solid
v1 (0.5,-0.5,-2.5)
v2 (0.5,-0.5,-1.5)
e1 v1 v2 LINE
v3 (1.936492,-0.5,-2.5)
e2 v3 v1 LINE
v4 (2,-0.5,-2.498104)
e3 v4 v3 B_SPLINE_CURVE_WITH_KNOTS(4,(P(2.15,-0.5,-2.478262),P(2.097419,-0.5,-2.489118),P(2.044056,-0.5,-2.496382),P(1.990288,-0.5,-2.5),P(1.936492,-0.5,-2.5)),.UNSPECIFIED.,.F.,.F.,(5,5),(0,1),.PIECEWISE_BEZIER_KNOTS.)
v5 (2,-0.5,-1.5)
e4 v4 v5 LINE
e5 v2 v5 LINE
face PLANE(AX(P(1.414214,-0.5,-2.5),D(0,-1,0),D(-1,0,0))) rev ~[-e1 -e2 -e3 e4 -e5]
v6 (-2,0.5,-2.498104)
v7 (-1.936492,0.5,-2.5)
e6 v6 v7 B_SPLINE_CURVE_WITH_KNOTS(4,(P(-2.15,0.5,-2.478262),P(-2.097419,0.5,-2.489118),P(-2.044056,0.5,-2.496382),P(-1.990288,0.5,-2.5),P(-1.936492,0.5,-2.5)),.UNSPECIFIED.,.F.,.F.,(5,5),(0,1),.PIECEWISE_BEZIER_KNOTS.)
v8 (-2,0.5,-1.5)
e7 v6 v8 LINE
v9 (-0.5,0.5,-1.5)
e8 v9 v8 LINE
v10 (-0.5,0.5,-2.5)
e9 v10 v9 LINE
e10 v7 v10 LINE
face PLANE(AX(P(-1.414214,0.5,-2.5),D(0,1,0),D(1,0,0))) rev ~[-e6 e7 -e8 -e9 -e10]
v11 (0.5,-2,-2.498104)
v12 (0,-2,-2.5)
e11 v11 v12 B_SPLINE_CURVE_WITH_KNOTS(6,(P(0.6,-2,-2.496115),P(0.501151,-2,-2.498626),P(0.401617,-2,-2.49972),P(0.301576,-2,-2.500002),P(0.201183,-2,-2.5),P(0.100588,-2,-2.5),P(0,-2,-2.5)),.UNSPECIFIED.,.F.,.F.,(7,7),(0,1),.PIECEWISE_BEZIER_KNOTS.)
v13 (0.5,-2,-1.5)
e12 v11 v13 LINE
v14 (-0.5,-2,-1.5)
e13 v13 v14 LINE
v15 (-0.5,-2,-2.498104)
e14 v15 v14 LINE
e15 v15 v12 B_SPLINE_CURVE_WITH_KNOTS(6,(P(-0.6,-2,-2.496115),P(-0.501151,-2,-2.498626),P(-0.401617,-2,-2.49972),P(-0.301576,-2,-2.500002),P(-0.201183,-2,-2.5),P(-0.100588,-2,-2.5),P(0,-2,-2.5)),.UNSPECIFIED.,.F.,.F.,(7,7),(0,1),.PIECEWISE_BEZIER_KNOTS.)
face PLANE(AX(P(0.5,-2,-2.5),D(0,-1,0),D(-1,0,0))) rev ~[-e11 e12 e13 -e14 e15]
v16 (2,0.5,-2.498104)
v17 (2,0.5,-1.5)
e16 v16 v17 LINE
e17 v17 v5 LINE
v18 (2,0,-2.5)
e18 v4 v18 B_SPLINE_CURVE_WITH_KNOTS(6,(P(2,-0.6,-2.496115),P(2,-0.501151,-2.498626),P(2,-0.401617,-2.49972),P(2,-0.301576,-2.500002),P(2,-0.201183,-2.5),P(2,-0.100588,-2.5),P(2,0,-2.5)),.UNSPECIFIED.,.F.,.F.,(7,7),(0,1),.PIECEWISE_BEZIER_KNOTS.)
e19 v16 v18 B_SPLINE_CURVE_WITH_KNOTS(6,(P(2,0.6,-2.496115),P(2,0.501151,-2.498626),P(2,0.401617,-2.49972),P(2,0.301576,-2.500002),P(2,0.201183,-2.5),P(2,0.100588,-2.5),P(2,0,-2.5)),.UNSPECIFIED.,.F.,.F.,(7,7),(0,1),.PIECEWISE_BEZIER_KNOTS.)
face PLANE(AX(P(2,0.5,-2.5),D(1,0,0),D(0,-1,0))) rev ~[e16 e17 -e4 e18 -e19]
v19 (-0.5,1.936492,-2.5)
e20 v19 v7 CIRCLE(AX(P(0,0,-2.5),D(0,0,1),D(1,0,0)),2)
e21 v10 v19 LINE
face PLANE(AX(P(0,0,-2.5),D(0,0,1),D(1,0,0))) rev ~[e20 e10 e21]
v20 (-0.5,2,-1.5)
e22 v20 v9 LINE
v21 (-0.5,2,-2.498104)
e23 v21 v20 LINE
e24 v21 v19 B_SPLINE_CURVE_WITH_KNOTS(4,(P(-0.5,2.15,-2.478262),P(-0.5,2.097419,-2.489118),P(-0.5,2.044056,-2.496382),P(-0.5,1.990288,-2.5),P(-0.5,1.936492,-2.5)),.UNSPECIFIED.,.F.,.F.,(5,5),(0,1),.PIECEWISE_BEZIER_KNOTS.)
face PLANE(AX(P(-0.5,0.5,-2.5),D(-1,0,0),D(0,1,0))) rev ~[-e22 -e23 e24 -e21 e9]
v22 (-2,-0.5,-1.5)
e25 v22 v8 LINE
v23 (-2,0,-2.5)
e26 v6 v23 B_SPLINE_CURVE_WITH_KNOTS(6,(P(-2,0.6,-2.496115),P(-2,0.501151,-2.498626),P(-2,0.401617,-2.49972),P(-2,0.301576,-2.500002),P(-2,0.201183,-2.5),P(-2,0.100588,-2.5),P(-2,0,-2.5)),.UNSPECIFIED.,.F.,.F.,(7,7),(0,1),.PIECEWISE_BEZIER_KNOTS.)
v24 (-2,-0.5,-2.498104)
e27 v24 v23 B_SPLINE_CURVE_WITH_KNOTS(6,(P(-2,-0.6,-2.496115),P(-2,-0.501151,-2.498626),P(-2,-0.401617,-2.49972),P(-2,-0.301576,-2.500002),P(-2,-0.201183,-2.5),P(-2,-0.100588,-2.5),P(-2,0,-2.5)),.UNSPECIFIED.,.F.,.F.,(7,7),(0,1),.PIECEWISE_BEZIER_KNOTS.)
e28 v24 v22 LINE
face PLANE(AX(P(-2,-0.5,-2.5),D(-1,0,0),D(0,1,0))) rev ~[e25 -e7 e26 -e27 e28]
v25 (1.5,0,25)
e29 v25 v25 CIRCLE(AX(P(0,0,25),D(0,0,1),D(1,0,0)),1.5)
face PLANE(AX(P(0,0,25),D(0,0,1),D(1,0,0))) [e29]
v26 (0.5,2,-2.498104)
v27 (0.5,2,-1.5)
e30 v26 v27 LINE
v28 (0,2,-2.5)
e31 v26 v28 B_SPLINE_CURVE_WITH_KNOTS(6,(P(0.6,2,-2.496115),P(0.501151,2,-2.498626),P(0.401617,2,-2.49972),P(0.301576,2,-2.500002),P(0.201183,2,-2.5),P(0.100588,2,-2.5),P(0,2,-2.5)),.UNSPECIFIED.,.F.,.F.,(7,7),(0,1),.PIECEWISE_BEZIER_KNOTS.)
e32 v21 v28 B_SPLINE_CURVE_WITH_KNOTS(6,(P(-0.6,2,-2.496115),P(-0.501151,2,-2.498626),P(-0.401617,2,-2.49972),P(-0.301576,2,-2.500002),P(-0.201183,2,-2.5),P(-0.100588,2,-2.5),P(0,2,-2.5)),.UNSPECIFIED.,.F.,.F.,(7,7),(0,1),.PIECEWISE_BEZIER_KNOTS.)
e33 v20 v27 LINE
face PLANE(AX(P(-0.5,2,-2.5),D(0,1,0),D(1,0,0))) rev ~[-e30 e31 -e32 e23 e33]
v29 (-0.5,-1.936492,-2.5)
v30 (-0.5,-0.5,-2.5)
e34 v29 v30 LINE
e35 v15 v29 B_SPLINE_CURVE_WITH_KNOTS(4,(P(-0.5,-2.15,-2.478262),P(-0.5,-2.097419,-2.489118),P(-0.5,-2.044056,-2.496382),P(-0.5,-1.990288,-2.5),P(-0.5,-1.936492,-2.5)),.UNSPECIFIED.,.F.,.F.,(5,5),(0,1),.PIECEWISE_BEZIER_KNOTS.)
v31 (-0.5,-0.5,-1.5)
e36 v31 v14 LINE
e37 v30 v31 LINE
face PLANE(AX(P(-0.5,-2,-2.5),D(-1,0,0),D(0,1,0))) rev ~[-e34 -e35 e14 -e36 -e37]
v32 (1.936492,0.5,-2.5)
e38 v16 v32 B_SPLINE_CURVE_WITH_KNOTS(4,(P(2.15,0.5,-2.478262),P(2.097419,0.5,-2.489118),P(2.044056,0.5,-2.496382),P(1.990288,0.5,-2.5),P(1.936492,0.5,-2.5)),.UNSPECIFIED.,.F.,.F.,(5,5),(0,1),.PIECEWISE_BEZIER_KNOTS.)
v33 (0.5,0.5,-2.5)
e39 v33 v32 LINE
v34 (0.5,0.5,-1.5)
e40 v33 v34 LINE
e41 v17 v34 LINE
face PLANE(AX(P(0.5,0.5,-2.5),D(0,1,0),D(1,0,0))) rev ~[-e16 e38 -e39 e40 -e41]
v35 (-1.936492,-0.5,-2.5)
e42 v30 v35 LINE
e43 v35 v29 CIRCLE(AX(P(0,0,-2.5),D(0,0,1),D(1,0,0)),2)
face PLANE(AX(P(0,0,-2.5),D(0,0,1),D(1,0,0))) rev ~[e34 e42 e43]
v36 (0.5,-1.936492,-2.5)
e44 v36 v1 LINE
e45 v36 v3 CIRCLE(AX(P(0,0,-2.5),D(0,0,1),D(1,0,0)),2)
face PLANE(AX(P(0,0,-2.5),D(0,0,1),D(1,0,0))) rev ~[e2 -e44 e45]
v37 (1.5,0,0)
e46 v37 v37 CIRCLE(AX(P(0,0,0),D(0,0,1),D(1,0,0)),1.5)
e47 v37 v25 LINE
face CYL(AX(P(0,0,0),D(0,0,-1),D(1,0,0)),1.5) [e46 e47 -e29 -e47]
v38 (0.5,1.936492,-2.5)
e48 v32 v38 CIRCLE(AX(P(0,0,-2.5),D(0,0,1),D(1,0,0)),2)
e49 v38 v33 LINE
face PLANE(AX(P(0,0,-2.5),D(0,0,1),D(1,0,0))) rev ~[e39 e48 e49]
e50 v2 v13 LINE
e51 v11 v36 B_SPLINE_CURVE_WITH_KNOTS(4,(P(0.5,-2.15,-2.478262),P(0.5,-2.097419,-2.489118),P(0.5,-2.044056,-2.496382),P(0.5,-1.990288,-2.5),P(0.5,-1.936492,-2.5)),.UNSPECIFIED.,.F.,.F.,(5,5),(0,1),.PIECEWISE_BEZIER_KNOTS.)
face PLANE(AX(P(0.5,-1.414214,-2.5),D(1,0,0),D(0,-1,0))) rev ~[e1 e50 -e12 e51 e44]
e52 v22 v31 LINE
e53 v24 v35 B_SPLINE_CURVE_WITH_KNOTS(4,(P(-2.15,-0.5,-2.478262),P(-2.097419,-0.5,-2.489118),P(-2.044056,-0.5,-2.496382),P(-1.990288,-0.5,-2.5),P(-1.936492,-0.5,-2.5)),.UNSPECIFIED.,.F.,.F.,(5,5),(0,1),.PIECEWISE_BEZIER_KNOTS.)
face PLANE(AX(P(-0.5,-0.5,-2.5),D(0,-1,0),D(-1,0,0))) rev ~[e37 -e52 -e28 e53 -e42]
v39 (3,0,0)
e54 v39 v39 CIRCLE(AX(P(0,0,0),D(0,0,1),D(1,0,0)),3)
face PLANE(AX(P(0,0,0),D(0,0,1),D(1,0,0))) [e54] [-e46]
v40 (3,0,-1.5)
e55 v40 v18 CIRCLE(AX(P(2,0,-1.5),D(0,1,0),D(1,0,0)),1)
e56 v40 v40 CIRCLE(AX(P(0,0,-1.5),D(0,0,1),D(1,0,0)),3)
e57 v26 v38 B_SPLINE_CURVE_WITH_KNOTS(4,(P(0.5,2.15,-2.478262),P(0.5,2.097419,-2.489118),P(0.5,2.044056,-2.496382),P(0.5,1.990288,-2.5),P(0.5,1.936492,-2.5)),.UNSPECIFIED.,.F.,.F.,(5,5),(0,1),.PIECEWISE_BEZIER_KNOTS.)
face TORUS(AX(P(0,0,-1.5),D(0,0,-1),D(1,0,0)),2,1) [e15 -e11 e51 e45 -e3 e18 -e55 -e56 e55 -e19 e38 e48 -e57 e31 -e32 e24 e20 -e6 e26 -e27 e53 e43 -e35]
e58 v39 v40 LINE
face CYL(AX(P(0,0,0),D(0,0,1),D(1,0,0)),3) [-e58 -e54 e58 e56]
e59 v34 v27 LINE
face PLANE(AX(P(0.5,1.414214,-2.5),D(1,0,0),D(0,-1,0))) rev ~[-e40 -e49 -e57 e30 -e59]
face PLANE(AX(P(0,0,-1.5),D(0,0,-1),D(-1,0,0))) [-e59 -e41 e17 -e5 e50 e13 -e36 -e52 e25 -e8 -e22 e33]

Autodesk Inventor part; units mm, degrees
ref_plane "YZ Plane" through (0, 0, 0) normal (1, 0, 0) x (0, 1, 0)
ref_plane "XZ Plane" through (0, 0, 0) normal (0, 1, 0) x (-1, 0, 0)
ref_plane "XY Plane" through (0, 0, 0) normal (0, 0, 1) x (1, 0, 0)
sketch "Sketch1" plane through (0, 0, 0) normal (0, 0, 1) x (1, 0, 0)
  circle A0 centre (0, 0) radius 1.5
  circle A1 centre (0, 0) radius 3
  dimension "d0" = 3
  dimension "d1" = 6
extrude "Extrusion1" add sketch "Sketch1" along normal blind 25 contours A0
sketch "Sketch2" plane through (0, 0, 0) normal (0, 0, -1) x (-1, 0, 0)
  point P0 (0, 0)
extrude "Extrusion2" add sketch "Sketch1" against normal blind 2.5 contours A0 | A1
thread "Thread1" size "M3x0.5" class "6g" standard "ISO Metric profile" full length
sketch "Sketch3" plane through (0, 0, -2.5) normal (0, 0, -1) x (-1, 0, 0)
  point P0 (0, 0)
sketch "Sketch4" plane through (0, 0, -2.5) normal (0, 0, -1) x (-1, 0, 0)
  line L0 (-0.5, -2) -> (0.5, -2)
  line L1 (0.5, -2) -> (0.5, 2)
  line L2 (0.5, 2) -> (-0.5, 2)
  line L3 (-0.5, 2) -> (-0.5, -2)
  circle A0 centre (0, 0) radius 1.5 projected
  line L4 (-0.5, -2) -> (0.5, 2) construction
  line L5 (0.5, -2) -> (-0.5, 2) construction
  line L6 (-2, -0.5) -> (2, -0.5)
  line L7 (2, -0.5) -> (2, 0.5)
  line L8 (2, 0.5) -> (-2, 0.5)
  line L9 (-2, 0.5) -> (-2, -0.5)
  circle A1 centre (0, 0) radius 3 projected
  line L10 (-2, -0.5) -> (2, 0.5) construction
  line L11 (2, -0.5) -> (-2, 0.5) construction
  point P0 (-0.5, 0.5)
  point P1 (-0.5, -0.5)
  point P2 (0.5, -0.5)
  point P3 (0.5, 0.5)
  dimension "d8" = 1
  dimension "d9" = 4
  dimension "d10" = 4
  dimension "d11" = 1
extrude "Extrusion3" cut sketch "Sketch4" against normal blind 1 contours L3 A0 L1 L0 | L3 L6 L1 A0 | L6 A0 L8 L3 | L3 L8 L1 L6 | L6 L9 L8 A0 | L1 L8 A0 L6 | A0 L8 L7 L6 | L3 A0 L1 L8 | L3 L2 L1 A0
fillet "Fillet1" radius 1 1 edges at (-3, 0, -2.5)
properties part number "16x2.5 Bolt"
